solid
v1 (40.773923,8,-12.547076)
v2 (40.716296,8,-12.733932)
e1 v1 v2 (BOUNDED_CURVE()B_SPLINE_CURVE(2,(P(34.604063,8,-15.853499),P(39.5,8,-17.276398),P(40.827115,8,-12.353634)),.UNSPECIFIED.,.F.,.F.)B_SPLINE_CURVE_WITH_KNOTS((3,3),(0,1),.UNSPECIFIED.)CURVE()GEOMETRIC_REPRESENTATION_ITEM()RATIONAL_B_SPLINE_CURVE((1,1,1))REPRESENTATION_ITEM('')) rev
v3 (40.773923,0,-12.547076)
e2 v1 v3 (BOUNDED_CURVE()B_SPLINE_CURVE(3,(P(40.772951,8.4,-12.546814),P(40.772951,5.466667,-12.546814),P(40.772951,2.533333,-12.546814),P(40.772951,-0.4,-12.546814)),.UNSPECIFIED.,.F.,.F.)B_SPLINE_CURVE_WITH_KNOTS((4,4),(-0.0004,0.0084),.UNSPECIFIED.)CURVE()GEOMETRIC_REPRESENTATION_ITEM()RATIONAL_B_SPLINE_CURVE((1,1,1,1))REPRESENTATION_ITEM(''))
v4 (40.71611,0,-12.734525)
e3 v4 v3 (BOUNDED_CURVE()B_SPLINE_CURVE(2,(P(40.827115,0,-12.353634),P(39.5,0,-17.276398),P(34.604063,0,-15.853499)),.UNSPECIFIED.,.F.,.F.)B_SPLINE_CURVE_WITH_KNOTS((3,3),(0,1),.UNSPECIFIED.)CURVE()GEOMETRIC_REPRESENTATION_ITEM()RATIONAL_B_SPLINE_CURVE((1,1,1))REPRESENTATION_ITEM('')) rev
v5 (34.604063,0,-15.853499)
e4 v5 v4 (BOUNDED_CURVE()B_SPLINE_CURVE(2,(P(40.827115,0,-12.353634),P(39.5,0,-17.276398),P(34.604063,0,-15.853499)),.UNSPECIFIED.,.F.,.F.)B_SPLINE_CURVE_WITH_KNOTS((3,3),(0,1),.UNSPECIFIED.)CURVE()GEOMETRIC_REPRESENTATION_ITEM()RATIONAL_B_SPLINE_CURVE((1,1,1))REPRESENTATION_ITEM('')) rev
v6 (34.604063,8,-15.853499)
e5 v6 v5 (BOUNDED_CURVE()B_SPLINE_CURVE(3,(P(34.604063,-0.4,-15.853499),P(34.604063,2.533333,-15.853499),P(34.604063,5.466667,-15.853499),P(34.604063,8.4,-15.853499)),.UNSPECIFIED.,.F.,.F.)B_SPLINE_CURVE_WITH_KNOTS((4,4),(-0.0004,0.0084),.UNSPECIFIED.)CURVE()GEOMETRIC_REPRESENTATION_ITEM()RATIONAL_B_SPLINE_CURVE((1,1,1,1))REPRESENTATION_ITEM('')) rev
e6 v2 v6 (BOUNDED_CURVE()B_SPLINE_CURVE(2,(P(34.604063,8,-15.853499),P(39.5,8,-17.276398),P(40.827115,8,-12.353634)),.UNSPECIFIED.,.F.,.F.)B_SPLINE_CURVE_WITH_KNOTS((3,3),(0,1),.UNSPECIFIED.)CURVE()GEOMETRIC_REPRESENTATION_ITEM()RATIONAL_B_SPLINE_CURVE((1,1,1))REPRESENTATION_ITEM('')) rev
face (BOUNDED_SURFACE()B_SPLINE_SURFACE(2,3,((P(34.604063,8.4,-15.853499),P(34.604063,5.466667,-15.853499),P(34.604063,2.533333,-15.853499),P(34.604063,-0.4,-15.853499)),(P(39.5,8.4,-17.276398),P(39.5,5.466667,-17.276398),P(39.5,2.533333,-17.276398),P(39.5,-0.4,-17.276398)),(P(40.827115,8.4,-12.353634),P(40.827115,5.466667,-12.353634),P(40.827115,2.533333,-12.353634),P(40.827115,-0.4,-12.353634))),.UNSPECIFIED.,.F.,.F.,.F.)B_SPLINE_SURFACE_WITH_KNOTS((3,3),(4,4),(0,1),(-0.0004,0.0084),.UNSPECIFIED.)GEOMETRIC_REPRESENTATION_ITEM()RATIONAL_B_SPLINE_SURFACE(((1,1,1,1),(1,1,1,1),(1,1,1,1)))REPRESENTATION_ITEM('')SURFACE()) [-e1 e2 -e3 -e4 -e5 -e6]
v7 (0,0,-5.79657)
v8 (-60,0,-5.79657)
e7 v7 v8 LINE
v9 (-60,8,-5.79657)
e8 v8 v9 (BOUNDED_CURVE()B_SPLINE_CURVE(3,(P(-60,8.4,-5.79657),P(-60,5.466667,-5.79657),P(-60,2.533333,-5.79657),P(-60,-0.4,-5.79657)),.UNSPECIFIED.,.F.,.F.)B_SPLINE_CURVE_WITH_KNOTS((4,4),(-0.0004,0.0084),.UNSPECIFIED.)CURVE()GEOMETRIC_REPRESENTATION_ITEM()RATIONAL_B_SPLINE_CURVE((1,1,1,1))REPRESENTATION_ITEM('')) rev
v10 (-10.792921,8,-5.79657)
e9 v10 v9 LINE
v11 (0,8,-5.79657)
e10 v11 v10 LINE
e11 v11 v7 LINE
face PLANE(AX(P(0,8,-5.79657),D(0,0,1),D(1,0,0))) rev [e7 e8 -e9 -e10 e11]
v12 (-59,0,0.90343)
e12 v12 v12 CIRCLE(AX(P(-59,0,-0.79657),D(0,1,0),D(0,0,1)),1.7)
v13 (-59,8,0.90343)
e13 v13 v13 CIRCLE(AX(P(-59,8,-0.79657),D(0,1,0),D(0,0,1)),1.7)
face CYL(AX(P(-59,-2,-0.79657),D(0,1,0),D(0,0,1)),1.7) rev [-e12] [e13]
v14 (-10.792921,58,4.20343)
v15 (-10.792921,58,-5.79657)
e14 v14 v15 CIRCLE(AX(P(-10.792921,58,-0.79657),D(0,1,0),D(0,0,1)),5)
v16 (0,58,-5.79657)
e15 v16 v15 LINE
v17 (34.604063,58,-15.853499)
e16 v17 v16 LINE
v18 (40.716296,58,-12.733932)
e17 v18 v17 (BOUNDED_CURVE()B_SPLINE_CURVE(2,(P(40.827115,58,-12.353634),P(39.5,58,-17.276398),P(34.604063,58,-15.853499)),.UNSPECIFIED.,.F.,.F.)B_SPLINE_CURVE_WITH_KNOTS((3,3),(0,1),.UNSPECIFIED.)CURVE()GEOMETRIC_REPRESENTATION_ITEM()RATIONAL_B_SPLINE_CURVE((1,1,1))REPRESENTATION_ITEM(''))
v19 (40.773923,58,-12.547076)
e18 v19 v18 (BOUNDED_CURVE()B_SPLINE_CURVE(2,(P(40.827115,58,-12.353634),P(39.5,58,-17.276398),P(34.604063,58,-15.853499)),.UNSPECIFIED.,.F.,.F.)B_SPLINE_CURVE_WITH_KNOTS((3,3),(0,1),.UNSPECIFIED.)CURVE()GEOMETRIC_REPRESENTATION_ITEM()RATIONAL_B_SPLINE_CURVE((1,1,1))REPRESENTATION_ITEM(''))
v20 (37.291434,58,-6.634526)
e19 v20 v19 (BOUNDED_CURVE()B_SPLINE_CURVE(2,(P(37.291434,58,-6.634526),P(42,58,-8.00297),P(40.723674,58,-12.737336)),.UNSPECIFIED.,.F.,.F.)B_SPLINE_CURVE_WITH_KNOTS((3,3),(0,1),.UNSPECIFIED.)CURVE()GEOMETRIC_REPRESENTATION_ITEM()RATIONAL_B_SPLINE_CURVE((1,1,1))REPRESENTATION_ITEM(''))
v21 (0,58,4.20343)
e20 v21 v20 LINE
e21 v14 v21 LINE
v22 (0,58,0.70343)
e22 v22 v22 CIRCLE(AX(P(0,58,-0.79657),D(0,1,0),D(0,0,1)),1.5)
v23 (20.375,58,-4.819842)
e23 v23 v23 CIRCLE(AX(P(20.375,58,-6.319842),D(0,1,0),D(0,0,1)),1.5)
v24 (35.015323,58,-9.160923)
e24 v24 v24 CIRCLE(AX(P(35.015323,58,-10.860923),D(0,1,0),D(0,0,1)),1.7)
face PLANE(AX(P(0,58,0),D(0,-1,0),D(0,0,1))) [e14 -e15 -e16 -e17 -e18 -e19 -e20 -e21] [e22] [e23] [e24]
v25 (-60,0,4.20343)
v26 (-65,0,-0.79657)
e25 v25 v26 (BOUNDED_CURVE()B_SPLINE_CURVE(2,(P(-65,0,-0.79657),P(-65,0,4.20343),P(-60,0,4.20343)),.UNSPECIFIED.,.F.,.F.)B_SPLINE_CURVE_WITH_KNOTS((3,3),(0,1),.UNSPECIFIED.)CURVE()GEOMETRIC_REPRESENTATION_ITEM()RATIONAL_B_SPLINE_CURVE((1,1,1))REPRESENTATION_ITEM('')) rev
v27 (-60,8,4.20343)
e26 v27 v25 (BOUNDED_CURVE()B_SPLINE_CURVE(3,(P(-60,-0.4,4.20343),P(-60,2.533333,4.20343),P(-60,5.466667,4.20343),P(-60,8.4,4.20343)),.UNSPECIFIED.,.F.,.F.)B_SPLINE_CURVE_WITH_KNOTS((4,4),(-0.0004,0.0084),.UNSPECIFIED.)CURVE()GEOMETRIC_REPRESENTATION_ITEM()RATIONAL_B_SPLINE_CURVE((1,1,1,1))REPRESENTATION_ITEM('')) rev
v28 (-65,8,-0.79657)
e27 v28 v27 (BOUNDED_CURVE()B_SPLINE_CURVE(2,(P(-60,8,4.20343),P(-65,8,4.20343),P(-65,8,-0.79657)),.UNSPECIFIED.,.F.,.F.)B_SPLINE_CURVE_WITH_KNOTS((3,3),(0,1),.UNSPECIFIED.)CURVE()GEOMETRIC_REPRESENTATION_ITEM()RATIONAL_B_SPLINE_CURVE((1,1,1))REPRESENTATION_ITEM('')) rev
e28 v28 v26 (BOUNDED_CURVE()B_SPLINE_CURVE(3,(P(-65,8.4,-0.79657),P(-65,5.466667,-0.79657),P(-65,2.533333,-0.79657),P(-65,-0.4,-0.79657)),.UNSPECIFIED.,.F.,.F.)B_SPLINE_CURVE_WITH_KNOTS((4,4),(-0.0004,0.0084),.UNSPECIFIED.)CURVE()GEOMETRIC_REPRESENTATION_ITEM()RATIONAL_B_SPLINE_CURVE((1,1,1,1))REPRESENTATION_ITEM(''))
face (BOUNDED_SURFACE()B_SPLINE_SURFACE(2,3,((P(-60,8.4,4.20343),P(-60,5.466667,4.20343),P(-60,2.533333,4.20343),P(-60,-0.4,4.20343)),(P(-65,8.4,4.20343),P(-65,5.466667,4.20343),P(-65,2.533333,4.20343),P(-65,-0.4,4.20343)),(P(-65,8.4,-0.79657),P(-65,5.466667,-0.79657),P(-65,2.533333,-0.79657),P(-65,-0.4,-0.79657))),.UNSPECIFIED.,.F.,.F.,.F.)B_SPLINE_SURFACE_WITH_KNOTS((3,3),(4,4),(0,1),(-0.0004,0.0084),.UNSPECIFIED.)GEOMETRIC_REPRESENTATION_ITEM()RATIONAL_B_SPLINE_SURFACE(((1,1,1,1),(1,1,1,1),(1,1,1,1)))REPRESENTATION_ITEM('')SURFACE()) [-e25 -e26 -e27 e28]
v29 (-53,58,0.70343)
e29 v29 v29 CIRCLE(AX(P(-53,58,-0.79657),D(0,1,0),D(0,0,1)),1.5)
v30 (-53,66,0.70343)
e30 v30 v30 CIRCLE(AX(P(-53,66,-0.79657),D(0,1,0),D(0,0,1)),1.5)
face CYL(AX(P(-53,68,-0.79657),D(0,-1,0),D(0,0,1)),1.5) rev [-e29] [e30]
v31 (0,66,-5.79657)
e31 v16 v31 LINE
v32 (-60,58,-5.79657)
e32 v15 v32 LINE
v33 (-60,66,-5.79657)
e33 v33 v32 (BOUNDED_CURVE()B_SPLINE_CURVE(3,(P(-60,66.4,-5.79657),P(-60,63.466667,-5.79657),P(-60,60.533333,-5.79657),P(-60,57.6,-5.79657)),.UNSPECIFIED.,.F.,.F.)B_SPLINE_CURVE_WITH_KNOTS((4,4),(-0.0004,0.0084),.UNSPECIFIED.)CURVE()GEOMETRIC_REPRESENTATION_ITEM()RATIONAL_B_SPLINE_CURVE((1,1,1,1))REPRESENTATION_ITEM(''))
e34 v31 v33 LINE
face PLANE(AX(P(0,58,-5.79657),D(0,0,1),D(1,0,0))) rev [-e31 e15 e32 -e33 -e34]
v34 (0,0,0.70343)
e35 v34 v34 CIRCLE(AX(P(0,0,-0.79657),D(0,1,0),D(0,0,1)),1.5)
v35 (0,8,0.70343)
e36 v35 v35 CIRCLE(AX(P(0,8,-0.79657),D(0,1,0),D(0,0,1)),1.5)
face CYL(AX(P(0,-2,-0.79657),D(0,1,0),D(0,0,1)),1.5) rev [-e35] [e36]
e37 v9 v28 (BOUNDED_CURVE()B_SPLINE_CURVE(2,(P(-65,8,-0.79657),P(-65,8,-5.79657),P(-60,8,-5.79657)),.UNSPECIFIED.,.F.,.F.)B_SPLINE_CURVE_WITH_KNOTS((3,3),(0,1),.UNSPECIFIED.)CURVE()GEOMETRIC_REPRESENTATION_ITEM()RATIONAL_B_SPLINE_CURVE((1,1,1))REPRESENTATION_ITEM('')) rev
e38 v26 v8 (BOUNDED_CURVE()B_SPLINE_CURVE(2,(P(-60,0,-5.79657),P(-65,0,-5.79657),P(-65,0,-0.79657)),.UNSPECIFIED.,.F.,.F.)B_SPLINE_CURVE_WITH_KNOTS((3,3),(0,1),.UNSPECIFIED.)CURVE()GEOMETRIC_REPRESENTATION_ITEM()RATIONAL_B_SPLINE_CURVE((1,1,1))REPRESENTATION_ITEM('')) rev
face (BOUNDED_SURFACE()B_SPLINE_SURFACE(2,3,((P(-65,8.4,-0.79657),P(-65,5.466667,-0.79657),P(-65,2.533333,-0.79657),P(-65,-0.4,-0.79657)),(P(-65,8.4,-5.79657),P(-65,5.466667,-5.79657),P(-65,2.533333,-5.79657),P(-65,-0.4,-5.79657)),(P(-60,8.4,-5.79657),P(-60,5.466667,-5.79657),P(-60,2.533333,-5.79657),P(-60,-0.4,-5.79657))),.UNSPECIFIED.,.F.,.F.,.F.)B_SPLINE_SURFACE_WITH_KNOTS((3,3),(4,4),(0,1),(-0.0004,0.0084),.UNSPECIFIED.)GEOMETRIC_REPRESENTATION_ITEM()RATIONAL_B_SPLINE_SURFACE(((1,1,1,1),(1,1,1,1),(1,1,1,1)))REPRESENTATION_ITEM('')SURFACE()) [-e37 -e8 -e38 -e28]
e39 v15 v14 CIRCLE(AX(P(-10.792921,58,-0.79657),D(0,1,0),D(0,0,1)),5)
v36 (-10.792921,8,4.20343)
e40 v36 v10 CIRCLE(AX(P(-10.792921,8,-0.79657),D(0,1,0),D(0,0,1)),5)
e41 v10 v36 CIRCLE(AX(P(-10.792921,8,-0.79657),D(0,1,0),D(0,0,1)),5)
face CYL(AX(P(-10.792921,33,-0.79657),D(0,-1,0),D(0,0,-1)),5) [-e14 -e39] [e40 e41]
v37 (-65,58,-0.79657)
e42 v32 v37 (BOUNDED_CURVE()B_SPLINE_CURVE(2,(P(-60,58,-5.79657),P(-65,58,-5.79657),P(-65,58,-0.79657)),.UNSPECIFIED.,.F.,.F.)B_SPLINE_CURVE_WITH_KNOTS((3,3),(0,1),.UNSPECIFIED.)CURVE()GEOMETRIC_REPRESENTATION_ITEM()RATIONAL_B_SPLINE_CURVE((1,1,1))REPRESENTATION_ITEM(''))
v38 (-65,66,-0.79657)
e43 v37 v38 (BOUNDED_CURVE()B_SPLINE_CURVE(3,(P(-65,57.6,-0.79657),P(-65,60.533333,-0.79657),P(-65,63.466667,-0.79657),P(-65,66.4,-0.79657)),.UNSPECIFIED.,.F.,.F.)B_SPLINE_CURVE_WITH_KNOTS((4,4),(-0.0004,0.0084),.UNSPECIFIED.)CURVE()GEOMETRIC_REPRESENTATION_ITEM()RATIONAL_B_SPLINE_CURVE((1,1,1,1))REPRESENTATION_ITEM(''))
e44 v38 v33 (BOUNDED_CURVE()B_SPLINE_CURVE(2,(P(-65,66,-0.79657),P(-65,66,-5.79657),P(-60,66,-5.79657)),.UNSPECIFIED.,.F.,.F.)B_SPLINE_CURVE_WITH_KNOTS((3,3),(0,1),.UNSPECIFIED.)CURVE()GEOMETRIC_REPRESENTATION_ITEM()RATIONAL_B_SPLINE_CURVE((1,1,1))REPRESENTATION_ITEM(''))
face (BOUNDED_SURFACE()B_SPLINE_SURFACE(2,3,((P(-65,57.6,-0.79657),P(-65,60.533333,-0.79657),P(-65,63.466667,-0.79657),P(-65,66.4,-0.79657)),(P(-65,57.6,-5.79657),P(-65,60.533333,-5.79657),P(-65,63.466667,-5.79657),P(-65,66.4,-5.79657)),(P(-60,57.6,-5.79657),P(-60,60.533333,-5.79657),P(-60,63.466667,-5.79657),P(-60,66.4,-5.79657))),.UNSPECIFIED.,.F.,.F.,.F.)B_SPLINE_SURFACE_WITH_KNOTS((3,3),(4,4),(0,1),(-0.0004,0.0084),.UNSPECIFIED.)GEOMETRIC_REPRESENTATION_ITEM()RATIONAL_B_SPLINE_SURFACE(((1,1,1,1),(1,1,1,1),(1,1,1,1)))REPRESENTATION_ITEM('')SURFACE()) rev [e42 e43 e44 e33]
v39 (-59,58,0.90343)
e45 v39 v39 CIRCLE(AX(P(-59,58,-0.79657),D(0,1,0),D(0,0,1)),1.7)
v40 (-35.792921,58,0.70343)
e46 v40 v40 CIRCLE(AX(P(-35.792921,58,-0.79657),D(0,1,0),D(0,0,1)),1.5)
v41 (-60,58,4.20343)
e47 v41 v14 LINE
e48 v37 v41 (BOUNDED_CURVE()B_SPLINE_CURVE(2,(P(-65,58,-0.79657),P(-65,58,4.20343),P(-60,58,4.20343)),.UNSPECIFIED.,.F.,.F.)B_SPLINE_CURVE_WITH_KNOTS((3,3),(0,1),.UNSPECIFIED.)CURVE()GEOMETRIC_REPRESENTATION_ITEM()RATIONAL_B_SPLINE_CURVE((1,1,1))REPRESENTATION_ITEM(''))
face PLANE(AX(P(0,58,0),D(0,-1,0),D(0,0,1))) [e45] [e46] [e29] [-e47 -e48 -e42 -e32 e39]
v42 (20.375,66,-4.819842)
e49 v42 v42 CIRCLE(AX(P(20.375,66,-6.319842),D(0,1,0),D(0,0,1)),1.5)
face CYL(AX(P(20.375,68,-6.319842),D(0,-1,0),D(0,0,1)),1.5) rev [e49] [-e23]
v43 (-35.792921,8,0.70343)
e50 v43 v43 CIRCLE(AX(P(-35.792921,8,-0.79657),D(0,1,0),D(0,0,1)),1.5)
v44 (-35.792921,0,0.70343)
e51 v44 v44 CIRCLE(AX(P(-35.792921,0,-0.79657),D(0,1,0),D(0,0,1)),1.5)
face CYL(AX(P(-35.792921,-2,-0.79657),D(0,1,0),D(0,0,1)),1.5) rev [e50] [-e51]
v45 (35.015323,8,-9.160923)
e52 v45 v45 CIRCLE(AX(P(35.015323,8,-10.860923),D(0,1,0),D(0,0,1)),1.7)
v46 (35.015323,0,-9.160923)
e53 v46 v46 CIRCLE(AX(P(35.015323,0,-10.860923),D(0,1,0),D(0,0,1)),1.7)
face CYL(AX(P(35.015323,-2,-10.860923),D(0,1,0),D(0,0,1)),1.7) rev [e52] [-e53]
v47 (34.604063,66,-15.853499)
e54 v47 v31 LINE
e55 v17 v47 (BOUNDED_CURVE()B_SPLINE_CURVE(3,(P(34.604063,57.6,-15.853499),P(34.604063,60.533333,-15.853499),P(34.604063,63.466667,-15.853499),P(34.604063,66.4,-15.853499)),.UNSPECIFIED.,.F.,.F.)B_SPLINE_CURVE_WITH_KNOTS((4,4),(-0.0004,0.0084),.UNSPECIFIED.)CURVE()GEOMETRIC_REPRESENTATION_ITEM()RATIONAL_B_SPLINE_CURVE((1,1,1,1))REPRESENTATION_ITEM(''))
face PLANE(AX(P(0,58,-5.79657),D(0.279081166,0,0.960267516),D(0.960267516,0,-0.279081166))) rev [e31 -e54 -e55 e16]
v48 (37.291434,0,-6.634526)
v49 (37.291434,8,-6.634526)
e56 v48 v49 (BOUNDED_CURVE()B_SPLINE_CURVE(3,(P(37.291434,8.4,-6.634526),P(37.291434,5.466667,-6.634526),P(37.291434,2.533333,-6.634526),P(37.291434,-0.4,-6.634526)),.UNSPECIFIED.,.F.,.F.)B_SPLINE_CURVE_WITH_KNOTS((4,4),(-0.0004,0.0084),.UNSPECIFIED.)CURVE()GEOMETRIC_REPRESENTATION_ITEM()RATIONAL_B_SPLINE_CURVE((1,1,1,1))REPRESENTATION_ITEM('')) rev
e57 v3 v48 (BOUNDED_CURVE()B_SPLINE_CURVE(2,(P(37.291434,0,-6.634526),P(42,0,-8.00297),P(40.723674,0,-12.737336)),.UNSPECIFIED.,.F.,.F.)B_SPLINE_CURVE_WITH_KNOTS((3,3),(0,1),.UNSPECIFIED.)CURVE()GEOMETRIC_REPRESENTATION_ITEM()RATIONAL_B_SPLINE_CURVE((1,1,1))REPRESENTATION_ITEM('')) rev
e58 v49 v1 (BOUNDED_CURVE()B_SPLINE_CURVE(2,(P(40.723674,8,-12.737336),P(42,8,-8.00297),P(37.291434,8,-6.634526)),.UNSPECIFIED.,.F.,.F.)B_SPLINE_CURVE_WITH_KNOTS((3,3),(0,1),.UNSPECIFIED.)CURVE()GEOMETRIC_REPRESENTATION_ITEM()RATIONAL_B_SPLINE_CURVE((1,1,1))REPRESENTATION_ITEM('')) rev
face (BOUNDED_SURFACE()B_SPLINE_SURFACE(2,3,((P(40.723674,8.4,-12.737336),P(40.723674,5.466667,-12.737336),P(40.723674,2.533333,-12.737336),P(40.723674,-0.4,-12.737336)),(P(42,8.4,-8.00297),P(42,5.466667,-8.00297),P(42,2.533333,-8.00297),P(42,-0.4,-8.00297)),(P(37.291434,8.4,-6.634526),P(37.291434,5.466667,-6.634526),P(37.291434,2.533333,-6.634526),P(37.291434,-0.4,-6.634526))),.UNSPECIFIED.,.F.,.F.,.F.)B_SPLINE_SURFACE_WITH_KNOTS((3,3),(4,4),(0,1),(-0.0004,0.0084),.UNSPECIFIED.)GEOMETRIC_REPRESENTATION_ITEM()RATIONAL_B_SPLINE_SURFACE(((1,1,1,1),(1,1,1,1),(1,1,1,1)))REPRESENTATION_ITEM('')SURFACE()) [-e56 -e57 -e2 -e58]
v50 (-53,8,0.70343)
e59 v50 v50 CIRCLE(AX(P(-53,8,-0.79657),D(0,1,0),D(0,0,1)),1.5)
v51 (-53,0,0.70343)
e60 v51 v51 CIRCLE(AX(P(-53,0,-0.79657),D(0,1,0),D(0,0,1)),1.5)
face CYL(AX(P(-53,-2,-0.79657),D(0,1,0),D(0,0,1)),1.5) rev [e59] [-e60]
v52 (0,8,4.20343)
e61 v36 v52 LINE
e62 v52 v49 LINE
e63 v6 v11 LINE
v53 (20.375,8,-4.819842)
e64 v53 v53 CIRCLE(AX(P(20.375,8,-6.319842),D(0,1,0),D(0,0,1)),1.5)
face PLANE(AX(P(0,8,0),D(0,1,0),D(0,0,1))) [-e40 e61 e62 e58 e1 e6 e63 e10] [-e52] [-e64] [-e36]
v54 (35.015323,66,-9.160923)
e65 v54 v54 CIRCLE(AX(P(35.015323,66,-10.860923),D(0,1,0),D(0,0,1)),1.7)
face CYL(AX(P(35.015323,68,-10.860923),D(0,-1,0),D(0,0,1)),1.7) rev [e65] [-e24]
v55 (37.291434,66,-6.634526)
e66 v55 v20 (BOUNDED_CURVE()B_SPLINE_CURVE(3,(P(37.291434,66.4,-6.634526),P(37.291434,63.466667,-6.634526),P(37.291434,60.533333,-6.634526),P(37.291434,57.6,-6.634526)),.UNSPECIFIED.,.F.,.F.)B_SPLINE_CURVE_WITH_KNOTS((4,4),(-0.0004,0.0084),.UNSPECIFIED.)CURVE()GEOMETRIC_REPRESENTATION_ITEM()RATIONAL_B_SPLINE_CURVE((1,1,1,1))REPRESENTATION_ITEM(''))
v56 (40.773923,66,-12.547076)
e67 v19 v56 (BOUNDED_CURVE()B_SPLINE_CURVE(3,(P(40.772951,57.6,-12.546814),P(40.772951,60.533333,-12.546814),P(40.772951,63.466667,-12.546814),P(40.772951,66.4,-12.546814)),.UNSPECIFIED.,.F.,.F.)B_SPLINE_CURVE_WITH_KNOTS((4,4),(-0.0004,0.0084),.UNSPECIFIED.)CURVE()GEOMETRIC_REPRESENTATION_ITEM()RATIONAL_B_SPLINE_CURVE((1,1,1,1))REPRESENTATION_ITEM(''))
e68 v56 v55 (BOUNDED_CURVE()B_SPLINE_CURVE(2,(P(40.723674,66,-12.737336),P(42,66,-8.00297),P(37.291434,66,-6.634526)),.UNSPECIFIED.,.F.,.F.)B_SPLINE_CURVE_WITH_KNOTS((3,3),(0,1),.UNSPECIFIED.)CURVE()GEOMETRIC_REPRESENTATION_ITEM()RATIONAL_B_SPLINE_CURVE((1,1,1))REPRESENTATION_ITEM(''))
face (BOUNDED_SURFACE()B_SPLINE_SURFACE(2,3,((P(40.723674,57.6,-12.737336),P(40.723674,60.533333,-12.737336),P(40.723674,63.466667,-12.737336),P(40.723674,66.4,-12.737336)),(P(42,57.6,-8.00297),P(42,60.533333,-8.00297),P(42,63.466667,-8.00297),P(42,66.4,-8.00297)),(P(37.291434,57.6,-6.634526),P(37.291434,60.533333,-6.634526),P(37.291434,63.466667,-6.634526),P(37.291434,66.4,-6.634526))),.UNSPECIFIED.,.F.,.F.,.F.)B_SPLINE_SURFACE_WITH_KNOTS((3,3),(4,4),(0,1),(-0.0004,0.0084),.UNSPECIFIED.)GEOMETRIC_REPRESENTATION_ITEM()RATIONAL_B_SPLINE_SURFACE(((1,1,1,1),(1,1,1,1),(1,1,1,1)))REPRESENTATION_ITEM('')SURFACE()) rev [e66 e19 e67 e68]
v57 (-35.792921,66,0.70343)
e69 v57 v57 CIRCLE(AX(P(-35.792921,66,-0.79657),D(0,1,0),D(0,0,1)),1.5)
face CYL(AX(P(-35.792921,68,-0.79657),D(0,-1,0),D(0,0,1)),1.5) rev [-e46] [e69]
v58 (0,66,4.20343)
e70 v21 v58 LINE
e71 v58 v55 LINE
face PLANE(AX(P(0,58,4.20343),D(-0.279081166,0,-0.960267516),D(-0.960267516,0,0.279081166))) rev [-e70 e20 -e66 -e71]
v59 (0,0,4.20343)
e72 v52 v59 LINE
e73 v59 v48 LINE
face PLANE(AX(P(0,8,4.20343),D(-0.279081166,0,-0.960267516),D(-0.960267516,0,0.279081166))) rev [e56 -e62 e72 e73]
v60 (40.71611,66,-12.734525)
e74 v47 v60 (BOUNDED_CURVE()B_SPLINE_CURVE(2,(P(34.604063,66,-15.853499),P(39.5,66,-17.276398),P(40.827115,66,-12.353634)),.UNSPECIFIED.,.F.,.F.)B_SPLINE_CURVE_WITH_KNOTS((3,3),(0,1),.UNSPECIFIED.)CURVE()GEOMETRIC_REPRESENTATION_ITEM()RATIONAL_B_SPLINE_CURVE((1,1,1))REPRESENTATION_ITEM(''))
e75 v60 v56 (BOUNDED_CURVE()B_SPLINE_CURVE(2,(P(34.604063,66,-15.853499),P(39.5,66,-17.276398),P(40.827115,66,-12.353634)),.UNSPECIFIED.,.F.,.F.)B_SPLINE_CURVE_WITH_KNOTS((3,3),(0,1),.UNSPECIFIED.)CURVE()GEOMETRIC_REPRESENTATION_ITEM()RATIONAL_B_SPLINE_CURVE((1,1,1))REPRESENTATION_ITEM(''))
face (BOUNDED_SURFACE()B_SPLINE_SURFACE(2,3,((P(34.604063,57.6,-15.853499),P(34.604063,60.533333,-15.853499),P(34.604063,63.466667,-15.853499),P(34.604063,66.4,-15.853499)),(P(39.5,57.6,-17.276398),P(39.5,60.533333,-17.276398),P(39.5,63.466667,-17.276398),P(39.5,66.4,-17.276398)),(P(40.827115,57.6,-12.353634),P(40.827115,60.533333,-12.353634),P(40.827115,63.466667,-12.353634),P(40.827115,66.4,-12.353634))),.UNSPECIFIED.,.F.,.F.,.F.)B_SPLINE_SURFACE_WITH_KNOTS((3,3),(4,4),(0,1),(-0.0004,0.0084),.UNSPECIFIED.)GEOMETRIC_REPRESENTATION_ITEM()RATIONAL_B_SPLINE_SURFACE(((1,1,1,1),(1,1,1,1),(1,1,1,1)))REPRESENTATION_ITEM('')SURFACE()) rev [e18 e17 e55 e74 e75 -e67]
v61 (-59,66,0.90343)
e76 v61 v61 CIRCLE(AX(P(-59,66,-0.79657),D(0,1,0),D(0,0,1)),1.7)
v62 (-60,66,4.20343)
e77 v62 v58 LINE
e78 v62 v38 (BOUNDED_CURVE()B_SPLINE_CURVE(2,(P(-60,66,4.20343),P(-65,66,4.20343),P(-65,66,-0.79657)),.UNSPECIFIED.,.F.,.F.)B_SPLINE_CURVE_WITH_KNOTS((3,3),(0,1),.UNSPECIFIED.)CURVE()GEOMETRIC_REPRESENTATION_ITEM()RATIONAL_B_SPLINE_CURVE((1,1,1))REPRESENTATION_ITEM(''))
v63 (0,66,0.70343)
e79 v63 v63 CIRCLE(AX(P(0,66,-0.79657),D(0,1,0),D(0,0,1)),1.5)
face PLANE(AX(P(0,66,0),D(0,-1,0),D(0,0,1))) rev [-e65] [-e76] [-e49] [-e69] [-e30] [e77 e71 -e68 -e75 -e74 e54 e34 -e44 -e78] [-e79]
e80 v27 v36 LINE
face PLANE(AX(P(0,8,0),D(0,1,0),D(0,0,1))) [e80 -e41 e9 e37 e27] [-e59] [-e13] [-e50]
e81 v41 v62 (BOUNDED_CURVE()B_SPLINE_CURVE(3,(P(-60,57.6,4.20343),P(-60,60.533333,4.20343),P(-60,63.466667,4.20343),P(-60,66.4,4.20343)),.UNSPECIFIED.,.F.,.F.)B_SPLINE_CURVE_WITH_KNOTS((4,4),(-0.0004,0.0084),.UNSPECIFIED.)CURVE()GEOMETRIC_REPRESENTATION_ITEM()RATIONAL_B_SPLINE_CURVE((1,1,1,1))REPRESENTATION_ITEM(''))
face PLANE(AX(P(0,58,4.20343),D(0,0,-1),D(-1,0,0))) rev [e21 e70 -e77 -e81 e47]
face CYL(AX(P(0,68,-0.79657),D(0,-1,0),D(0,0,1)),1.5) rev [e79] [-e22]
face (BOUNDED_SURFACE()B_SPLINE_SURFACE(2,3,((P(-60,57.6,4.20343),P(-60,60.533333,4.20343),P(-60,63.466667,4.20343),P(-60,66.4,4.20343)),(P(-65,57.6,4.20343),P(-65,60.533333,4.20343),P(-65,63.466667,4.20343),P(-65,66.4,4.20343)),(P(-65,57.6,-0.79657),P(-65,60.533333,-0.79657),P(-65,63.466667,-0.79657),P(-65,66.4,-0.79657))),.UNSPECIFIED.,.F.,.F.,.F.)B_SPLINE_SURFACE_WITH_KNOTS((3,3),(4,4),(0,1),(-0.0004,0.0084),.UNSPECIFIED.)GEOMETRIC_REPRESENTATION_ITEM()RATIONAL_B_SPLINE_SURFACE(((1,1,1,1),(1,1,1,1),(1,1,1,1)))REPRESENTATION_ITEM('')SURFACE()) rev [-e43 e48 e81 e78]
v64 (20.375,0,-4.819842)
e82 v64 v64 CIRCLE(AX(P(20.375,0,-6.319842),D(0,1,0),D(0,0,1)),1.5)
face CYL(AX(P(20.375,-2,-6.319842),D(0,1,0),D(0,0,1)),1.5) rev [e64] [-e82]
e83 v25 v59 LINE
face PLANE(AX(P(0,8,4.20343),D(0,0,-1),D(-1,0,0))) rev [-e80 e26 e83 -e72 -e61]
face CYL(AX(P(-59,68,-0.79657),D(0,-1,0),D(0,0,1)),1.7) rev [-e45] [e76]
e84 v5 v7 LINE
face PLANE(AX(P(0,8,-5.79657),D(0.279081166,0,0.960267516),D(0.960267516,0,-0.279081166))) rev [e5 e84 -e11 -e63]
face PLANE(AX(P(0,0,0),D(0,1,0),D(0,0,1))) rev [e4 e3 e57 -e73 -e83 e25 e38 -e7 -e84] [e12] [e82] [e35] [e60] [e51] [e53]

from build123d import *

# Parameters (mm, degrees)
BOSS_EXTRUDE1_DEPTH = 8
SKETCH2_R           = 1.7
SKETCH2_R_2         = 1.5
CUT_EXTRUDE1_DEPTH  = 10
FILLET1_SIZE        = 5
SKETCH3_R           = 5
BOSS_EXTRUDE2_DEPTH = 25


with BuildPart() as part:
    # Sketch1 → Boss-Extrude1 (new body)
    with BuildSketch(Plane(origin=(0, 0, 0), x_dir=(1, 0, 0), z_dir=(0, 1, 0))):
        Polygon((0, 5.796570021), (-65, 5.796570021), (-65, -4.203429979), (0, -4.203429979), (42, 8.002969552), (39.5, 17.276398151), align=None)
    extrude(amount=BOSS_EXTRUDE1_DEPTH)

    # Sketch2 → Cut-Extrude1 (cut)
    with BuildSketch(Plane(origin=(0, 8, 0), x_dir=(1, 0, 0), z_dir=(0, 1, 0))):
        with Locations(Location((-59, 0.796570021, 0), (0, 0, 270))):
            Circle(SKETCH2_R)
        with Locations(Location((-53, 0.796570021, 0), (0, 0, 270))):
            Circle(SKETCH2_R_2)
        with Locations(Location((-35.792921067, 0.796570021, 0), (0, 0, 270))):
            Circle(SKETCH2_R_2)
        with Locations(Location((20.375, 6.319841926, 0), (0, 0, 270))):
            Circle(SKETCH2_R_2)
        with Locations(Location((35.015323176, 10.860923065, 0), (0, 0, 270))):
            Circle(SKETCH2_R)
        with Locations(Location((0, 0.796570021, 0), (0, 0, 270))):
            Circle(SKETCH2_R_2)
    extrude(amount=-CUT_EXTRUDE1_DEPTH, mode=Mode.SUBTRACT)

    # Fillet1
    # a fillet whose section is not a circle: 5 mm, written as the material it takes off along each edge
    with BuildSketch(Plane(origin=(-65, -12.5, 4.203429979), x_dir=(0, 0, -1), z_dir=(0, 1, 0)), Plane(origin=(-65, -12.5, -5.796570021), x_dir=(1, 0, 0), z_dir=(0, 1, 0))) as fillet1_piece_1:
        with BuildLine():
            Bezier((FILLET1_SIZE, 0), (0, 0), (0, -FILLET1_SIZE), weights=[1, 1, 1])
            Line((0, -FILLET1_SIZE), (0, 0))
            Line((0, 0), (FILLET1_SIZE, 0))
        make_face()
    extrude(amount=33, mode=Mode.SUBTRACT)

    # Fillet2
    # a fillet whose section is not a circle: 5 mm, written as the material it takes off along each edge
    with BuildSketch(Plane(origin=(39.5, -12.746283343, -17.276398151), x_dir=(-0.9602675163397548, 0, 0.27908116572545455), z_dir=(0, 1, 0))) as fillet2_piece_1:
        with BuildLine():
            Bezier((5.098513337, 0), (0, 0), (0.099464892, 5.097543034), weights=[1, 1, 1])
            Line((0.099464892, 5.097543034), (0, 0))
            Line((0, 0), (5.098513337, 0))
        make_face()
    extrude(amount=33.492566686, mode=Mode.SUBTRACT)
    with BuildSketch(Plane(origin=(42, -12.258475337, -8.002969552), x_dir=(-0.2602945720874772, 0, -0.9655292516241013), z_dir=(0, 1, 0))) as fillet2_piece_2:
        with BuildLine():
            Bezier((4.903390135, 0), (0, 0), (-0.09565831, 4.902456966), weights=[1, 1, 1])
            Line((-0.09565831, 4.902456966), (0, 0))
            Line((0, 0), (4.903390135, 0))
        make_face()
    extrude(amount=32.516950674, mode=Mode.SUBTRACT)

    # Sketch3 → Boss-Extrude2 (add)
    with BuildSketch(Plane(origin=(0, 8, 0), x_dir=(1, 0, 0), z_dir=(0, 1, 0))):
        with Locations(Location((-10.792921067, 0.796570021, 0), (0, 0, 270))):
            Circle(SKETCH3_R)
    extrude(amount=BOSS_EXTRUDE2_DEPTH)

    # Mirror3: part across plane


with BuildPart() as part_1:
    add(part.part)
    add(part.part.mirror(Plane.ZX.offset(33)))


solid = part_1.part
